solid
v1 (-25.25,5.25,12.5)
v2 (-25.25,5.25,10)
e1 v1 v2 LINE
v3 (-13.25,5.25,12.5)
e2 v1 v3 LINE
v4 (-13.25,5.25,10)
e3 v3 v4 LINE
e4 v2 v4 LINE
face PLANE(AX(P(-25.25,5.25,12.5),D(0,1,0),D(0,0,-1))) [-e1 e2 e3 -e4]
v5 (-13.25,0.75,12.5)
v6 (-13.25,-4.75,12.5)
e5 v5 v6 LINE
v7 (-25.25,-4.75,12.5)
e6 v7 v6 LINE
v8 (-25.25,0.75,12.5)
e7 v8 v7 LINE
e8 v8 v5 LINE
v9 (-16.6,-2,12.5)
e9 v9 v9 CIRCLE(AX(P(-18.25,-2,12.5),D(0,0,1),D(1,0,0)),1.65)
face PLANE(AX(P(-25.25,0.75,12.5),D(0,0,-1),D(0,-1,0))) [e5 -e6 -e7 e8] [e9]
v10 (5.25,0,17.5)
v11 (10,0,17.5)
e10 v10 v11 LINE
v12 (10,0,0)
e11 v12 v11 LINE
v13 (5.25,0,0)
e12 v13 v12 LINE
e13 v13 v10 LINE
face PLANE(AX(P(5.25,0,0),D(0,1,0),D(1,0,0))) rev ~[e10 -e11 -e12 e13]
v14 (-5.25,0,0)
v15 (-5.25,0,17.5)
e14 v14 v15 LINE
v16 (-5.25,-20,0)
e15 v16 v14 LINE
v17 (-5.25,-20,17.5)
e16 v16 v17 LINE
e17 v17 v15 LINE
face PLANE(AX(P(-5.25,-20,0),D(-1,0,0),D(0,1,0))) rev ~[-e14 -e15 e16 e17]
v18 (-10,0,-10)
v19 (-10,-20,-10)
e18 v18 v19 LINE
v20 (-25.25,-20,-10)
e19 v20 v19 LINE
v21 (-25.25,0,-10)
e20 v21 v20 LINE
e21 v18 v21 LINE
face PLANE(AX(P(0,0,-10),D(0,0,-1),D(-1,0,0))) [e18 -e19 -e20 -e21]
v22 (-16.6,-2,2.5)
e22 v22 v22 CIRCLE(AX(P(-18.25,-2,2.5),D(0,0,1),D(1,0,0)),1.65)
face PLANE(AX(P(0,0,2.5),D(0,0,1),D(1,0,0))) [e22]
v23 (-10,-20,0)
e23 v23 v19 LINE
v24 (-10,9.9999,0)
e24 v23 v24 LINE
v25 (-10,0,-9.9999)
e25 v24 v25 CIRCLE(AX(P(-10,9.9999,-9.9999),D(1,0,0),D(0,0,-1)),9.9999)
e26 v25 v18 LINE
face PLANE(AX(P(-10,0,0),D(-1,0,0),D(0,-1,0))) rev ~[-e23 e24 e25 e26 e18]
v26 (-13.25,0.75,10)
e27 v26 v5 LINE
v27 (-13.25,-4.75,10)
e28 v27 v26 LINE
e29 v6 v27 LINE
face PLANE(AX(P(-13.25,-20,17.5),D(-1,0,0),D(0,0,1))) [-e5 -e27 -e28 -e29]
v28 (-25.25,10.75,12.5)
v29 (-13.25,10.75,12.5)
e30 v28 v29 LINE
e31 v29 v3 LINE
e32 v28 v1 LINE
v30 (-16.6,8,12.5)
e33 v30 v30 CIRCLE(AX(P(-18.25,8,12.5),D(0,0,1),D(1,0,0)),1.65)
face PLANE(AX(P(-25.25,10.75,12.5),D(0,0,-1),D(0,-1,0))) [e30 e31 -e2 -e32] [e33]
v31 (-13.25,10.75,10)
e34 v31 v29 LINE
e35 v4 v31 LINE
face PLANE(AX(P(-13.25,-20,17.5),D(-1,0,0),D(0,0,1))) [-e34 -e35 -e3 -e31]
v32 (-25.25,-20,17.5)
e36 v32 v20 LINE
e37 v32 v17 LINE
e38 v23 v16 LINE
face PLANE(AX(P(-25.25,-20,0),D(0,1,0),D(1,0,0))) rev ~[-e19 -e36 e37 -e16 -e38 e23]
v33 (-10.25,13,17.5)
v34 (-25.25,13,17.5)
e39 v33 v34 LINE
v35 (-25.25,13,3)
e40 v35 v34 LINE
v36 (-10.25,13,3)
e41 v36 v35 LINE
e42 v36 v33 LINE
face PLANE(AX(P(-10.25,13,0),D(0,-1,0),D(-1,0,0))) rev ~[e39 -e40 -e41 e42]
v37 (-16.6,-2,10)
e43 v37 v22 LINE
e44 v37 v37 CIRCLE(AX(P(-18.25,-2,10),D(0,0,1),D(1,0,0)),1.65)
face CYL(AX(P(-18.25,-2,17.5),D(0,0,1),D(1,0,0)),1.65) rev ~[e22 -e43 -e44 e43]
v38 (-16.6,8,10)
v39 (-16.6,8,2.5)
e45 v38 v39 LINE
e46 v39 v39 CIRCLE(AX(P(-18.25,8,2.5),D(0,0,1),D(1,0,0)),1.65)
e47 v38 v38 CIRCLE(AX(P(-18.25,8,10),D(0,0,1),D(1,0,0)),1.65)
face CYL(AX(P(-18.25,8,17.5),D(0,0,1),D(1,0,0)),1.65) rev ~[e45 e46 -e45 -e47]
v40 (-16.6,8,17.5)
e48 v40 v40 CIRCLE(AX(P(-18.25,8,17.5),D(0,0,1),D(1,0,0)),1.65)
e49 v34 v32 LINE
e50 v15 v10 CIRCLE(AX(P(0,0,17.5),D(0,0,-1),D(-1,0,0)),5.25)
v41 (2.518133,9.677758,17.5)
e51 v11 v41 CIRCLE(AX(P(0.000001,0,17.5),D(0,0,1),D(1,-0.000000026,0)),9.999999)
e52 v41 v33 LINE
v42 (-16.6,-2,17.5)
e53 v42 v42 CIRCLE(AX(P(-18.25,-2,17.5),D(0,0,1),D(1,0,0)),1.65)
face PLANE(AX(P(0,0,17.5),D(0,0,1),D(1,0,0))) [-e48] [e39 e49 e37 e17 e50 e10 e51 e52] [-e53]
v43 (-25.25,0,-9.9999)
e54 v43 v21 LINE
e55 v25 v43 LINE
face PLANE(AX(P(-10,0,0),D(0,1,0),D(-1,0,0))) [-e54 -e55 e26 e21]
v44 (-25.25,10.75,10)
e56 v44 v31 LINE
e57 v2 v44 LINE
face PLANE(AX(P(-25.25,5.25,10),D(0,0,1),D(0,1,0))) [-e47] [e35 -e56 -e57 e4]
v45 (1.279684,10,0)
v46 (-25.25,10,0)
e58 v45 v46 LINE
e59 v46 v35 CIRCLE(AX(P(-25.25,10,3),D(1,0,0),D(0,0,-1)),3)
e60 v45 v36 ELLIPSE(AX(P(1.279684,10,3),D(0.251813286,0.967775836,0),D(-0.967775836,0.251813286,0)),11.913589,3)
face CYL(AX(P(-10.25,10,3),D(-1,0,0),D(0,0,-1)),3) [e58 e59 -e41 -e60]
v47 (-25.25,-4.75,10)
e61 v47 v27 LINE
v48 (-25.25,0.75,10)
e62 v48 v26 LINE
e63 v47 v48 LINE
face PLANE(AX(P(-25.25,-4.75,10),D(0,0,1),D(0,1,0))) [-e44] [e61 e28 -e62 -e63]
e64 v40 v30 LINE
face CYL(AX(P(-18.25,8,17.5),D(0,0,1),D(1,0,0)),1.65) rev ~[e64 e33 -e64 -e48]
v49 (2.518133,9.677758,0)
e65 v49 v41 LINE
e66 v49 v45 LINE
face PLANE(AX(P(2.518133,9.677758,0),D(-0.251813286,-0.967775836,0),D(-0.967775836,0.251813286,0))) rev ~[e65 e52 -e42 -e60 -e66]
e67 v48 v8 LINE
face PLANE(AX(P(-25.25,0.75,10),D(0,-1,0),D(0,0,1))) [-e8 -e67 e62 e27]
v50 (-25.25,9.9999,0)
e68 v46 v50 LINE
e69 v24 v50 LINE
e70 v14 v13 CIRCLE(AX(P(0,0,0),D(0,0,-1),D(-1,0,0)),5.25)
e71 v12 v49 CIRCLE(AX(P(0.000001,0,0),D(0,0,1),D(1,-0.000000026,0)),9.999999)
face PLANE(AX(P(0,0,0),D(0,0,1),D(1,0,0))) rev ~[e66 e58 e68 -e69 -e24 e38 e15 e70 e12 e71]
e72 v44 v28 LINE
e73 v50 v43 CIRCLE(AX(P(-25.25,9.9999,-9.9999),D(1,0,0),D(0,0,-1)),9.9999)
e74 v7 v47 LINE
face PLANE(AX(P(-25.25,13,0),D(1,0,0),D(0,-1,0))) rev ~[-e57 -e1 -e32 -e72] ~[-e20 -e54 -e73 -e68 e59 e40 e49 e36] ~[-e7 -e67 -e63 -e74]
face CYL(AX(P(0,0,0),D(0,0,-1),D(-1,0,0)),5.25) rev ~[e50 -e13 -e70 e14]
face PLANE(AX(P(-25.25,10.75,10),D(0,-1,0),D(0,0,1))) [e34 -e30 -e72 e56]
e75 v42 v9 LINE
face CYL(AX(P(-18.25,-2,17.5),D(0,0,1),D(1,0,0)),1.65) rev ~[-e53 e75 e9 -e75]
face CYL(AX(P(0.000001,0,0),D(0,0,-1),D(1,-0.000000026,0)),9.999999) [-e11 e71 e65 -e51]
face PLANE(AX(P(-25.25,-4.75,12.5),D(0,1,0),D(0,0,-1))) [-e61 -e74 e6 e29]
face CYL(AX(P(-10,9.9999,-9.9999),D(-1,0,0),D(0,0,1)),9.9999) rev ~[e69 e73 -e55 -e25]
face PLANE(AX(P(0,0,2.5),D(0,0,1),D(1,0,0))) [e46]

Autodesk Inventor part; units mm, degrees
ref_plane "YZ Plane" through (0, 0, 0) normal (1, 0, 0) x (0, 1, 0)
ref_plane "XZ Plane" through (0, 0, 0) normal (0, 1, 0) x (-1, 0, 0)
ref_plane "XY Plane" through (0, 0, 0) normal (0, 0, 1) x (1, 0, 0)
sketch "Sketch1" plane through (0, 0, 0) normal (0, 0, 1) x (1, 0, 0)
  arc A0 (5.25, 0) -> (-5.25, 0) centre (0, 0) ccw
  arc A1 (10, 0) -> (-3.960396, 9.182334) centre (0, 0) ccw
  line L0 (-5.25, -8.511022) -> (-5.25, -20)
  line L1 (-5.25, -20) -> (-25.25, -20)
  line L2 (-25.25, -20) -> (-25.25, 0)
  line L3 (5.25, 0) -> (10, 0)
  line L4 (-25.25, 0) -> (-3.960396, 9.182334)
  line L5 (-5.25, -8.511022) -> (-5.25, 0)
  line L6 (-25.25, 0) -> (-25.25, 13)
  line L7 (-25.25, 13) -> (-10.25, 13)
  line L8 (-10.25, 13) -> (2.706976, 9.628622)
  point P0 (1.153738, 9.933221)
  point P1 (2.518133, 9.677758)
  dimension "d0" = 10.5
  dimension "d1" = 20
  dimension "d3" = 20
  dimension "d5" = 20
  dimension "d6" = 0
  dimension "d7" = 20
  dimension "d14" = 13
  dimension "d18" = 15
sketch "Sketch1 outline for Extrusion1" plane through (0, 0, 0) normal (0, 0, 1) x (1, 0, 0)
  arc A0 (10, 0) -> (2.518133, 9.677758) centre (0, 0) ccw
  line L0 (2.518133, 9.677758) -> (-10.25, 13)
  line L1 (-10.25, 13) -> (-25.25, 13)
  line L2 (-25.25, 13) -> (-25.25, -20)
  line L3 (-25.25, -20) -> (-5.25, -20)
  line L4 (-5.25, -20) -> (-5.25, 0)
  arc A1 (-5.25, 0) -> (5.25, 0) centre (0, 0) cw
  line L5 (5.25, 0) -> (10, 0)
extrude "Extrusion1" add sketch "Sketch1 outline for Extrusion1" along normal blind 17.5
sketch "Sketch3" plane through (0, 0, 17.5) normal (0, 0, 1) x (1, 0, 0)
  point P0 (0, 0)
sketch "Sketch4" plane through (0, 0, 0) normal (0, 0, -1) x (-1, 0, 0)
  arc A0 (-2.518133, 9.677758) -> (-10, 0) centre (0, 0) ccw
  line L0 (25.25, 13) -> (25.25, -20)
  arc A1 (-2.518133, 9.677758) -> (-10, 0) centre (0, 0) ccw
  line L1 (-5.25, 0) -> (-10, 0)
  arc A2 (5.25, 0) -> (-5.25, 0) centre (0, 0) ccw
  line L2 (5.25, -20) -> (5.25, 0)
  line L3 (25.25, -20) -> (5.25, -20)
  circle A3 centre (0, 0) radius 10
  line L4 (10, 11.228722) -> (10, -20)
  line L5 (25.25, -20) -> (5.25, -20)
  line L6 (10, 0) -> (25.25, 0)
  line L7 (25.25, 13) -> (25.25, -20)
  line L8 (10.25, 13) -> (25.25, 13)
  line L9 (-2.518133, 9.677758) -> (10.25, 13)
  point P0 (-1.153738, 9.933221)
extrude "Extrusion3" add sketch "Sketch4" along normal blind 10 contours L6 L0 L3 L4
fillet "Fillet1" radius 10 1 edges at (-17.625, 0, 0)
sketch "Sketch5" plane through (0, 0, 17.5) normal (0, 0, 1) x (1, 0, 0)
  line L0 (-25.25, 13) -> (-25.25, -20)
  line L1 (-25.25, -20) -> (-5.25, -20)
  line L2 (-5.25, -20) -> (-5.25, 0)
  arc A0 (5.25, 0) -> (-5.25, 0) centre (0, 0) ccw
  line L3 (5.25, 0) -> (10, 0)
  arc A1 (10, 0) -> (2.518133, 9.677758) centre (0, 0) ccw
  line L4 (2.518133, 9.677758) -> (-10.25, 13)
  line L5 (-10.25, 13) -> (-25.25, 13)
  circle A2 centre (-18.25, 8) radius 1.65
  circle A3 centre (-18.25, -2) radius 1.65
  dimension "d19" = 3.3
  dimension "d20" = 3.3
  dimension "d22" = 5
  dimension "d23" = 10
  dimension "d24" = 7
  dimension "d25" = 7
extrude "Extrusion4" cut sketch "Sketch5" against normal blind 15 contours A2 | A3
sketch "Sketch6" plane through (-25.25, -20, 17.5) normal (-1, 0, 0) x (0, 0, 1)
  line L0 (-7.5, 30.75) -> (-5, 30.75)
  line L1 (-5, 30.75) -> (-5, 25.25)
  line L2 (-5, 25.25) -> (-7.5, 25.25)
  line L3 (-7.5, 25.25) -> (-7.5, 30.75)
  line L4 (-7.5, 20.75) -> (-5, 20.75)
  line L5 (-5, 20.75) -> (-5, 15.25)
  line L6 (-5, 15.25) -> (-7.5, 15.25)
  line L7 (-7.5, 15.25) -> (-7.5, 20.75)
  line L8 (0, 19.65) -> (0, 16.35) projected
  line L9 (0, 29.65) -> (0, 26.35) projected
  point P0 (-17.5, 20)
  point P1 (-27.5, 16.35)
  point P2 (-27.5, 19.65)
  dimension "d28" = 5.5
  dimension "d29" = 5.5
  dimension "d30" = 2.5
  dimension "d31" = 2.5
  dimension "d32" = 0
  dimension "d33" = 5
  dimension "d34" = 3.3
  dimension "d35" = 1.1
  dimension "d36" = 1.1
  dimension "d37" = 1.1
  dimension "d38" = 1.1
extrude "Extrusion5" cut sketch "Sketch6" against normal blind 12
fillet "Fillet2" radius 3 1 edges at (-17.75, 13, 0)
equation "\"d7\" = d5"
equation "\"d29\" = d28"
equation "\"d31\" = d30"
equation "\"d35\" = -0.5 * d34 + 0.5 * d28"
equation "\"d37\" = d38"
properties part number "XAxisLimitSwitchMount"
